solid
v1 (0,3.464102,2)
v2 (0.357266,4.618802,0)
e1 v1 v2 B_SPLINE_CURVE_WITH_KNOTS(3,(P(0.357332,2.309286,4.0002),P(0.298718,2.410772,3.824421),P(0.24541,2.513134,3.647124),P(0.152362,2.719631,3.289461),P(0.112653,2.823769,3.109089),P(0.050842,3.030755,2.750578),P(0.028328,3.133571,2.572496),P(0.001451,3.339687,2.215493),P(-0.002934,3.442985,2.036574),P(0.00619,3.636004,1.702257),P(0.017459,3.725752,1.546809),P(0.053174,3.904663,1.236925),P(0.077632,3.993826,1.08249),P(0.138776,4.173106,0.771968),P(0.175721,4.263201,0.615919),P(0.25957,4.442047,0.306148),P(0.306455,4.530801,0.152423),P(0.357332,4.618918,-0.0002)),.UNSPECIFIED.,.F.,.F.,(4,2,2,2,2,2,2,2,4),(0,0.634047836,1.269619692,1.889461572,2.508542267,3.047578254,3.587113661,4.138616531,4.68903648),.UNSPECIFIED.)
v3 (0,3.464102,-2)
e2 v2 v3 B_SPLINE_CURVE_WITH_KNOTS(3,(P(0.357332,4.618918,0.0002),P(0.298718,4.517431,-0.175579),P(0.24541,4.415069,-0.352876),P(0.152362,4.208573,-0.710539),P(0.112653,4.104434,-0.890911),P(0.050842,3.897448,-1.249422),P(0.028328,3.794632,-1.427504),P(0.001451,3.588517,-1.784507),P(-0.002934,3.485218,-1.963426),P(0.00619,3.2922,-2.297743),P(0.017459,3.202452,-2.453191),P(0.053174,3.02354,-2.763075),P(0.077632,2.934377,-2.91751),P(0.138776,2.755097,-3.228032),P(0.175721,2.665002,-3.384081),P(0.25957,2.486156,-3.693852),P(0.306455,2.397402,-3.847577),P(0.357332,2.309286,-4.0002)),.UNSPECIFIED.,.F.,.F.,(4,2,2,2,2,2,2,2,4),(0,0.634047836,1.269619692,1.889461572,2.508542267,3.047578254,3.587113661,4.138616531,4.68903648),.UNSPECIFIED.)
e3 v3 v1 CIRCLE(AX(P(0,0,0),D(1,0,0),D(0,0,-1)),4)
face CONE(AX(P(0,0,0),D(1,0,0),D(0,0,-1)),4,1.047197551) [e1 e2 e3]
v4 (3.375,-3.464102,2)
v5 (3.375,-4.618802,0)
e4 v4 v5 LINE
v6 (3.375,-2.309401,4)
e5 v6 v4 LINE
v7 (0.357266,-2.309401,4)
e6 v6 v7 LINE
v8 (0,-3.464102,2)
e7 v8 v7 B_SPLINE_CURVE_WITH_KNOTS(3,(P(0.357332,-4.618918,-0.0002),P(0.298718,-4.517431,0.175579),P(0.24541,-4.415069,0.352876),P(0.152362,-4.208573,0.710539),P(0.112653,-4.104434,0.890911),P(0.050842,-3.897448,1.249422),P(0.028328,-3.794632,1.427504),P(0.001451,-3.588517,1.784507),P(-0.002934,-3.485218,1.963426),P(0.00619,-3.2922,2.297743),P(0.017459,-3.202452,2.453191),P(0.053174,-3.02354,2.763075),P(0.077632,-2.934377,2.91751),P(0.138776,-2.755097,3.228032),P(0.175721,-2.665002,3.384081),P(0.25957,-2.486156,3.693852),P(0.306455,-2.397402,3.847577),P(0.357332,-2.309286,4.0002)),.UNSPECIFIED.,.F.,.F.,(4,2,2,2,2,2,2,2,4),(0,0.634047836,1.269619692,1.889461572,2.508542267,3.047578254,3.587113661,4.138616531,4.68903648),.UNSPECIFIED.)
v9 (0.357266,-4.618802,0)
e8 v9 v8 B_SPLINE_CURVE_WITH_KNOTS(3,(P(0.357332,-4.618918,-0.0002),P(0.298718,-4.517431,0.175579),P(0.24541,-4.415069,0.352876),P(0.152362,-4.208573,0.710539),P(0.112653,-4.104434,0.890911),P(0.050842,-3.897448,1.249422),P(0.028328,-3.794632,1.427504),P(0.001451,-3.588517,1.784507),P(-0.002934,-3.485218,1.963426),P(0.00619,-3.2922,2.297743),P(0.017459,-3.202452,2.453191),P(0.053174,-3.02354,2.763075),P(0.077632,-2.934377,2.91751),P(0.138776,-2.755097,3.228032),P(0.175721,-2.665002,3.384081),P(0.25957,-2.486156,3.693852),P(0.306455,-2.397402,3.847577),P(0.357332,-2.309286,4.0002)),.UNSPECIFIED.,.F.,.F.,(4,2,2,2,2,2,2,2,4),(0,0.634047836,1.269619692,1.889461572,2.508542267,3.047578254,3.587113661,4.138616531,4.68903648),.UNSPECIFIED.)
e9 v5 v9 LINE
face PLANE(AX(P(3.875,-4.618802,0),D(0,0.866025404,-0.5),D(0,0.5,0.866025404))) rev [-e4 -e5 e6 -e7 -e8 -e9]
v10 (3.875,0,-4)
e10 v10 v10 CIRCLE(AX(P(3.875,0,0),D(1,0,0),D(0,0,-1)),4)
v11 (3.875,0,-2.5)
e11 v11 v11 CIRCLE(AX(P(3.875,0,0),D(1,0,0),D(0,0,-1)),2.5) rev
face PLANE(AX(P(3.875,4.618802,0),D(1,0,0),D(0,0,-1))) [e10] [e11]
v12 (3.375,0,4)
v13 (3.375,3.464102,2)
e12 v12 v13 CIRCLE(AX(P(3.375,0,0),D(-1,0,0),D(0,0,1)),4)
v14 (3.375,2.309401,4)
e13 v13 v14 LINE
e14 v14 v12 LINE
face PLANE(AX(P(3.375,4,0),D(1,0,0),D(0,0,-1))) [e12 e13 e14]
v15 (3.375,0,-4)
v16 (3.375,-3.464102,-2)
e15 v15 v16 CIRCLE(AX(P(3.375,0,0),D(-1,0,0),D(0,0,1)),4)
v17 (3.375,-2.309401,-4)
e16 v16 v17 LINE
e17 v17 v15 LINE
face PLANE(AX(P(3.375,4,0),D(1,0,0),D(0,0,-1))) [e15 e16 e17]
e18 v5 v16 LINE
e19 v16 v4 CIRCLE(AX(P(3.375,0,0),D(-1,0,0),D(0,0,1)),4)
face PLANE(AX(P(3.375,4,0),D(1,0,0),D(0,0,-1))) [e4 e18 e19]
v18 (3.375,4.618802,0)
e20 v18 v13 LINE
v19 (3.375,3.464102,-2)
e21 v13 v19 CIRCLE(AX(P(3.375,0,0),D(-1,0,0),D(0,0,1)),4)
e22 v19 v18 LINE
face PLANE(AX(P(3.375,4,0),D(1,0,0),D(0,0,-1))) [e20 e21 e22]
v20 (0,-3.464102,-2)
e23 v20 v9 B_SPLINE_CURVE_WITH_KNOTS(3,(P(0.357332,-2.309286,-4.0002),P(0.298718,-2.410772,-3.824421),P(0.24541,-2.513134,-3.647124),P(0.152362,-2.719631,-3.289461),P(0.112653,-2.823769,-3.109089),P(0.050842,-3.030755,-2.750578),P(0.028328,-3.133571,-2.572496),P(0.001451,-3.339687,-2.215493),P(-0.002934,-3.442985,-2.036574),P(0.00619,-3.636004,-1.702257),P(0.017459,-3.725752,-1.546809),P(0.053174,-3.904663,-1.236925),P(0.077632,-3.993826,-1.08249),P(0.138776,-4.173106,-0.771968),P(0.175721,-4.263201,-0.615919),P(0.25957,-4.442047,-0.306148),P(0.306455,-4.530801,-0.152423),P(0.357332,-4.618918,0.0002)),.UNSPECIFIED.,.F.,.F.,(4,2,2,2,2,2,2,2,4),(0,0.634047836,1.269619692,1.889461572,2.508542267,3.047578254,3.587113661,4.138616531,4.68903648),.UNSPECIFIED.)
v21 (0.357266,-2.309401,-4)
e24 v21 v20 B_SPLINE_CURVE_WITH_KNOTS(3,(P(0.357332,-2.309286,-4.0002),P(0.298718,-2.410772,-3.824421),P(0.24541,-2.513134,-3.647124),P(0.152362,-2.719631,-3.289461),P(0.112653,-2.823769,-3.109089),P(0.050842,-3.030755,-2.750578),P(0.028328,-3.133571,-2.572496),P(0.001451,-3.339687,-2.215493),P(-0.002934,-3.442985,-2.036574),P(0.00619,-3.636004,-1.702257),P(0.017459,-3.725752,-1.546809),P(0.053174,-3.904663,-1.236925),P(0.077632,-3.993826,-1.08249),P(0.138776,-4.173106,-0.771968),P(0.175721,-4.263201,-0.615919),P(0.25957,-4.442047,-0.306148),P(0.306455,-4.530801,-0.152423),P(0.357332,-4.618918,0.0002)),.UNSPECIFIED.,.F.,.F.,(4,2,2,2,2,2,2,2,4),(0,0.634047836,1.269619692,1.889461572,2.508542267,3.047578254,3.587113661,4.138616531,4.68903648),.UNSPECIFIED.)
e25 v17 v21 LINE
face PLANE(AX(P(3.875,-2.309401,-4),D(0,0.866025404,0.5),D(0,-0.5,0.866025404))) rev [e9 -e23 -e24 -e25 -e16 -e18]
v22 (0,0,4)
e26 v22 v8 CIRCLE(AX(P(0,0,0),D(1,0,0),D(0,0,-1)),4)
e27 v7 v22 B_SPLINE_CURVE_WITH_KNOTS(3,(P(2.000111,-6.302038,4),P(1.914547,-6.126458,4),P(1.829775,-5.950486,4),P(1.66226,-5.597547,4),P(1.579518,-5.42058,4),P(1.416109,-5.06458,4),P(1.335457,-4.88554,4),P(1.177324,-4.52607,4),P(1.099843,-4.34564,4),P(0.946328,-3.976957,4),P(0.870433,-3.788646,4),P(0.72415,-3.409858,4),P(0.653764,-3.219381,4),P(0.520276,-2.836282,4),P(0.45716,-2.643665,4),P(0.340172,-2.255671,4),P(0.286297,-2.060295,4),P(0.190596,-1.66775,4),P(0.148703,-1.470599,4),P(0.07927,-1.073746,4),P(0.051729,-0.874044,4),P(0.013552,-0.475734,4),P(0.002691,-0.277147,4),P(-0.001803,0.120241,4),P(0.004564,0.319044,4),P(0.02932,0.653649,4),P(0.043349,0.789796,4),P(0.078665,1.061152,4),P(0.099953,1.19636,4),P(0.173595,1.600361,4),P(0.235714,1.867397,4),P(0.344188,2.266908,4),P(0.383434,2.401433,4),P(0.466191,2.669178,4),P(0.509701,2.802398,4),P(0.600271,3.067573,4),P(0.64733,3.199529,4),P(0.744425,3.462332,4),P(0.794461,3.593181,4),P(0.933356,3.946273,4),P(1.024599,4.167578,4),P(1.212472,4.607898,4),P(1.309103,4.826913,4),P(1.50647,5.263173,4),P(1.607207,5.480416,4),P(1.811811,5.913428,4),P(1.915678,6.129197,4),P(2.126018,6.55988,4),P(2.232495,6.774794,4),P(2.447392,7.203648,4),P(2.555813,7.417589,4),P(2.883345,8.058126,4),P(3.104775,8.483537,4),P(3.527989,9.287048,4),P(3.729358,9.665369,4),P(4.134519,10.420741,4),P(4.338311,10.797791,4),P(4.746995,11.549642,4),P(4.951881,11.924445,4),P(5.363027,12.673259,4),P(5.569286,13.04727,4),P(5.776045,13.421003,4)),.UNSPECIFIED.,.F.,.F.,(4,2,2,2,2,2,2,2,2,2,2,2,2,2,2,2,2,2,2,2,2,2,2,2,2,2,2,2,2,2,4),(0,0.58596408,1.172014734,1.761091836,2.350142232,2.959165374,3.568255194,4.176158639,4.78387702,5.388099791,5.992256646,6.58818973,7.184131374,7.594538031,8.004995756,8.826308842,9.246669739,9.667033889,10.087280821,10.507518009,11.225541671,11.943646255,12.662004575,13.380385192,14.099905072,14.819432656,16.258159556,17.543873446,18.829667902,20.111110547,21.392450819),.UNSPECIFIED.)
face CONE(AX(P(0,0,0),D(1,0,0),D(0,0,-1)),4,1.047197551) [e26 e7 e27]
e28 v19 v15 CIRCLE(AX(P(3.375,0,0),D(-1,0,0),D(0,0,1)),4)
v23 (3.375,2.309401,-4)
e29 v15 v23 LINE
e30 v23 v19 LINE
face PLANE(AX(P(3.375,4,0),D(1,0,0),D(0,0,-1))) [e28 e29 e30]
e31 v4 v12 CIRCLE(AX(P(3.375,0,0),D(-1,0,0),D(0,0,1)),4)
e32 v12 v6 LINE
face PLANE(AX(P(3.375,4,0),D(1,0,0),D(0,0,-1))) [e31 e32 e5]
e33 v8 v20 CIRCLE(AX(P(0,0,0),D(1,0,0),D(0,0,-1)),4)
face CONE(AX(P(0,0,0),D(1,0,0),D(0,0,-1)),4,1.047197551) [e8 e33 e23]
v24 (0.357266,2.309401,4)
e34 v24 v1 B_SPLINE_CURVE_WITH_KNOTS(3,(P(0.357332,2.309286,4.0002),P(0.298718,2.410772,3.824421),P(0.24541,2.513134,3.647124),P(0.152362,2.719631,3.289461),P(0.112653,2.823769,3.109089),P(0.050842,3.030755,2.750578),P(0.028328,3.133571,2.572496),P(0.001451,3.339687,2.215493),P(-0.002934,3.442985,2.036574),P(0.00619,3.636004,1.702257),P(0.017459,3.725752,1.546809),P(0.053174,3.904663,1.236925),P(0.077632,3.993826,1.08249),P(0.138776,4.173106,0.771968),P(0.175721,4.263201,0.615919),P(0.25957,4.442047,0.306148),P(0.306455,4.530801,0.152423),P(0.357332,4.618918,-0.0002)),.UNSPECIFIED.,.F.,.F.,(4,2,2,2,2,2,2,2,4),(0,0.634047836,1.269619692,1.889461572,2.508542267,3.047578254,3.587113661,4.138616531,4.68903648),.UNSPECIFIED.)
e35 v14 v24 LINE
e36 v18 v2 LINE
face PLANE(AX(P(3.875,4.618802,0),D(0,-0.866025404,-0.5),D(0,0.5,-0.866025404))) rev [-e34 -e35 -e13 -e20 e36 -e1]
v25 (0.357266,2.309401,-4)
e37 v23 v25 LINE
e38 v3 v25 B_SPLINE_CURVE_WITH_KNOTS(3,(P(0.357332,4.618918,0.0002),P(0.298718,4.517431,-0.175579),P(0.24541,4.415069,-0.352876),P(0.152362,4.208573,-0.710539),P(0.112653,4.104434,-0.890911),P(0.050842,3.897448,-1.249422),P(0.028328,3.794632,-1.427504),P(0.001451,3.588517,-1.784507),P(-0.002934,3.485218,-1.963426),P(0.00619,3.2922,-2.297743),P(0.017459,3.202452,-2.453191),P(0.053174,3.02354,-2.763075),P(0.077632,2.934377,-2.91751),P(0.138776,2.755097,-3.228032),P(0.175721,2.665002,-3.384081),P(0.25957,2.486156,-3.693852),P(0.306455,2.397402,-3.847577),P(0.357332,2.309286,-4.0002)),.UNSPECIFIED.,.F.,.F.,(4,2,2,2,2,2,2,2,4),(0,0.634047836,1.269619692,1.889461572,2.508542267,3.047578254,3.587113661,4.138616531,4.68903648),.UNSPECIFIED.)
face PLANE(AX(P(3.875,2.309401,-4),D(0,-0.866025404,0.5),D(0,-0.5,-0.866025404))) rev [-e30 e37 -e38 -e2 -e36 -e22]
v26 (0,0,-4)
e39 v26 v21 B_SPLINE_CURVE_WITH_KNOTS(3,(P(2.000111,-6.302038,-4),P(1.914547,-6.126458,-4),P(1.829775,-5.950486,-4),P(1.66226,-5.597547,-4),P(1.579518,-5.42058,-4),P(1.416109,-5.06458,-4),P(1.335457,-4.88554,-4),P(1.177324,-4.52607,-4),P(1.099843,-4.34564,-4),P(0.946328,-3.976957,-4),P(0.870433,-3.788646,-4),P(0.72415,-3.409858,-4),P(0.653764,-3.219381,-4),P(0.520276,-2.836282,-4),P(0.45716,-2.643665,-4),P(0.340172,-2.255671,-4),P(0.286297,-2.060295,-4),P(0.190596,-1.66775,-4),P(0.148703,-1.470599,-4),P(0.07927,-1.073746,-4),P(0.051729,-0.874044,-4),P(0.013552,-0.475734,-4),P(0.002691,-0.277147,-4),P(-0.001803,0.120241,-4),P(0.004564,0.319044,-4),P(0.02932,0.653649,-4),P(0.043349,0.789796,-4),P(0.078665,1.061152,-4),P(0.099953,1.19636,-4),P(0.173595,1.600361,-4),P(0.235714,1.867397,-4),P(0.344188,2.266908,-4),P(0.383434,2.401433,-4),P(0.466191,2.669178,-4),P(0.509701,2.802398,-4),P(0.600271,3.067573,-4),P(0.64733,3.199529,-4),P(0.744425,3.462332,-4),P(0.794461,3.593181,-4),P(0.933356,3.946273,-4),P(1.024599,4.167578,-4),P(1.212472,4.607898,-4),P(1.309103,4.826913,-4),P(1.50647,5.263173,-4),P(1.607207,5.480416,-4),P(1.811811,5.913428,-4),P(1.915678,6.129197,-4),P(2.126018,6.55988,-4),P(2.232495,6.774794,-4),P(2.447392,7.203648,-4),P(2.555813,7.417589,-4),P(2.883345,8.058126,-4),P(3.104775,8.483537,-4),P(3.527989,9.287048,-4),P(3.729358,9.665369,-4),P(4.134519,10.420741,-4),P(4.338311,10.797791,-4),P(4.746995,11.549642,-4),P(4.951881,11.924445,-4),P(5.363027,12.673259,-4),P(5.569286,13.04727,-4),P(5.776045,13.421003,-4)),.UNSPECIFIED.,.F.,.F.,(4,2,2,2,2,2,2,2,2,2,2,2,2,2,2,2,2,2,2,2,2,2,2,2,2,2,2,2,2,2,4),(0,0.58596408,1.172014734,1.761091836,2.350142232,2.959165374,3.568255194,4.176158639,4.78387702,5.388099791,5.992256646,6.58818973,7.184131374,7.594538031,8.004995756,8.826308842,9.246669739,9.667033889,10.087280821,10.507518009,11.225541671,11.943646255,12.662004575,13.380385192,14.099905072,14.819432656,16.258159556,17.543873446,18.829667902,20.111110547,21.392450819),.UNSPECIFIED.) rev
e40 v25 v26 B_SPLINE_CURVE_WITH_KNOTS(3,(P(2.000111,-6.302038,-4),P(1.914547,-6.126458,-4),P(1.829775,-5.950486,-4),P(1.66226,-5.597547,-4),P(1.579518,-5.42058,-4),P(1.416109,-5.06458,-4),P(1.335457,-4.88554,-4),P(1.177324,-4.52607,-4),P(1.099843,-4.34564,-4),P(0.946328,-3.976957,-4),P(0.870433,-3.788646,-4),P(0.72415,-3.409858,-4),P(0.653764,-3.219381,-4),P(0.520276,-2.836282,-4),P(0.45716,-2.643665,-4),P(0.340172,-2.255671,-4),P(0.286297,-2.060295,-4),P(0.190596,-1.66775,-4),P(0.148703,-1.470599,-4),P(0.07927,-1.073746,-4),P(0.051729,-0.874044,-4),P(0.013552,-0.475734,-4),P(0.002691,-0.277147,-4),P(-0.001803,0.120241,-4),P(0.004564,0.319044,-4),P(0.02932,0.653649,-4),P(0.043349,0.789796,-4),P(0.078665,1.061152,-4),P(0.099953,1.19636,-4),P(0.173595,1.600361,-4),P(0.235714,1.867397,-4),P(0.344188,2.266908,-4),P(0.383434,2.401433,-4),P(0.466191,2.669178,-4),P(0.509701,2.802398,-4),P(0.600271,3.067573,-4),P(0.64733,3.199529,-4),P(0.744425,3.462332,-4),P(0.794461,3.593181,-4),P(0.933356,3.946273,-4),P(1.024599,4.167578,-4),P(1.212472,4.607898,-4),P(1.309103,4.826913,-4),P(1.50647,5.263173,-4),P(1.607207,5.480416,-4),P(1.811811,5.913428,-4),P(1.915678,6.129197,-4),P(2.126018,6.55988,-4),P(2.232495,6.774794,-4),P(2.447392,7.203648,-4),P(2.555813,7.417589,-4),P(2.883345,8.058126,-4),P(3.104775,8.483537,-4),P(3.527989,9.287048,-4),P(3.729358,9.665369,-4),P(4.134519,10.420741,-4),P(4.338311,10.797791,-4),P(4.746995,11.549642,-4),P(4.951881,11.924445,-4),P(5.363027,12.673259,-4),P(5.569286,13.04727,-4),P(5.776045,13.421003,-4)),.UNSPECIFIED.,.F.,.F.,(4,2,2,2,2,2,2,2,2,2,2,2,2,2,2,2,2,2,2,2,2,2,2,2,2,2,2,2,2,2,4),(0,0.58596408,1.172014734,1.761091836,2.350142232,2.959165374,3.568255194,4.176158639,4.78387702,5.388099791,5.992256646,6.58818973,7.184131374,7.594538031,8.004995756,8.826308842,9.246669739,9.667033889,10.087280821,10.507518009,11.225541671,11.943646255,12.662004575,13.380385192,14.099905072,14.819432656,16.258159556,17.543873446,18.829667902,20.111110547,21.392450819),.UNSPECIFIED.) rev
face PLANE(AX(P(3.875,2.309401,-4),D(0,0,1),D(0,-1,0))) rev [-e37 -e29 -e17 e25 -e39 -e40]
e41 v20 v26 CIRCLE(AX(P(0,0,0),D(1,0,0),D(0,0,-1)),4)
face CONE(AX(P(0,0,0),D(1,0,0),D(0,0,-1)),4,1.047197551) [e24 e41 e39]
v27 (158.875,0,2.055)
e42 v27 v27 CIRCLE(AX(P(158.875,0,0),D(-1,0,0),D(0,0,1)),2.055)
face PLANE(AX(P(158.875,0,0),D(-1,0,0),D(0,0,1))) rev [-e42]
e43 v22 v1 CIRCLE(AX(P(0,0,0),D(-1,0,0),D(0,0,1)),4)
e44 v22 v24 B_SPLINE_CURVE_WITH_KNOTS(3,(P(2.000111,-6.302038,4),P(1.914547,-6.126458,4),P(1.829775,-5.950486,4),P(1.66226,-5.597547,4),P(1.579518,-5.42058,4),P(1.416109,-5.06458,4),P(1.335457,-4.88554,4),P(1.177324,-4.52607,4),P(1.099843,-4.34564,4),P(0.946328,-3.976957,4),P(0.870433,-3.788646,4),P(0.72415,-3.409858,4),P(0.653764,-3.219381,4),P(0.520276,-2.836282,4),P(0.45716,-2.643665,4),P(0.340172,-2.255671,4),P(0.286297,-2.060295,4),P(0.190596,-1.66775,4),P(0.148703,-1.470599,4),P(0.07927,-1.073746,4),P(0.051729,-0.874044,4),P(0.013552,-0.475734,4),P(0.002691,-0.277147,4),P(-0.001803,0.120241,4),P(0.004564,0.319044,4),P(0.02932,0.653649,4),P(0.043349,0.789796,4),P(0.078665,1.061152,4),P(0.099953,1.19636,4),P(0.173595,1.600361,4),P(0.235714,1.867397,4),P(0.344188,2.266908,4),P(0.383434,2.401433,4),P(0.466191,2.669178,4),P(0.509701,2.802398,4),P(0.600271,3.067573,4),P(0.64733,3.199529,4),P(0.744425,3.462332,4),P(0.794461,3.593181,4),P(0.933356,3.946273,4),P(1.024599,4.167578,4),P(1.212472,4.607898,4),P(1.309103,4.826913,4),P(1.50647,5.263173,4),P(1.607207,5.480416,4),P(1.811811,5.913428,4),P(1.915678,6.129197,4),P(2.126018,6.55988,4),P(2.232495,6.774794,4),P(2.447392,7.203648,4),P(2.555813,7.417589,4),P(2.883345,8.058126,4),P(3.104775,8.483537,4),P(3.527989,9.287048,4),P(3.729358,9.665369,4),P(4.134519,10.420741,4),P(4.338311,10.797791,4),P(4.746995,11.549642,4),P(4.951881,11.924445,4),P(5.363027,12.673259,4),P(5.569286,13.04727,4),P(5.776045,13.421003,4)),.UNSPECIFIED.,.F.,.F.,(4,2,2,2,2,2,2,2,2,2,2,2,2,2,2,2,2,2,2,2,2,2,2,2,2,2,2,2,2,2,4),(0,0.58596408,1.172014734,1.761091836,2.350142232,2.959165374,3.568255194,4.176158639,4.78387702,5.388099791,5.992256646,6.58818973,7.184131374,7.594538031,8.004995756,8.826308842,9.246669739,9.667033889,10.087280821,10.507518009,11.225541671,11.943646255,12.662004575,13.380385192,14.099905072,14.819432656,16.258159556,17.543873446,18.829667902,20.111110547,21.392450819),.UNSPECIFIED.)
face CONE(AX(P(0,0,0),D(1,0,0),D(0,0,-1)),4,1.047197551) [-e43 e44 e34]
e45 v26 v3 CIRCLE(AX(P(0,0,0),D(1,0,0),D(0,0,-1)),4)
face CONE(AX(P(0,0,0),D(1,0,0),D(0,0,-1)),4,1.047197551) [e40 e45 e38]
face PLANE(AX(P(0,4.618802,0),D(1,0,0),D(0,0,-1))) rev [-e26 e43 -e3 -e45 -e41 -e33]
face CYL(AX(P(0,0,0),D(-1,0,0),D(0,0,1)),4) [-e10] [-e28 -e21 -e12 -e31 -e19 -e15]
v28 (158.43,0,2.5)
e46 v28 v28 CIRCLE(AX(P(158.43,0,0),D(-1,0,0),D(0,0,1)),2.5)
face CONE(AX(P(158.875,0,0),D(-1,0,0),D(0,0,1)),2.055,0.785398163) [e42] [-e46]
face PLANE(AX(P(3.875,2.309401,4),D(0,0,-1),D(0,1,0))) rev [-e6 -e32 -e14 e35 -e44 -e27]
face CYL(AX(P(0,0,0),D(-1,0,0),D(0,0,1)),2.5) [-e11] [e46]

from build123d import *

# Parameters (mm, degrees)
BASEHEAD_DEPTH = 3.875
SKETCH4_W      = 0.5
SKETCH4_H      = 10.618802154


# Read off the part's stored shape, not the designer's step: HeadChamfer
with BuildPart() as part:
    # Sketch1 → BaseHead (new body)
    with BuildSketch(Plane(origin=(0, 0, 0), x_dir=(0, 0, -1), z_dir=(1, 0, 0))):
        Polygon((4, 2.309401077), (4, -2.309401077), (0, -4.618802154), (-4, -2.309401077), (-4, 2.309401077), (0, 4.618802154), align=None)
    extrude(amount=BASEHEAD_DEPTH)

    # HeadChamfer outline → HeadChamfer (revolve, cut)
    with BuildSketch(Plane.YX):
        Polygon((4.618802148, 0.357265587), (3.999999382, -3.57e-07), (4.618802154, -3.57e-07), align=None)
    revolve(axis=Axis((0, 0, 0), (1, 0, 0)), mode=Mode.SUBTRACT)

    # HeadChamfer 2 outline → HeadChamfer 2 (revolve)
    with BuildSketch(Plane.YX):
        Polygon((2.5, 3.875), (2.5, 158.43), (2.055, 158.875), (0, 158.875), (0, 3.875), align=None)
    revolve(axis=Axis((0, 0, 0), (1, 0, 0)))

    # Sketch4 → BearingFace (revolve, cut)
    with BuildSketch(Plane.XY, mode=Mode.PRIVATE) as bearingface_sk:
        with Locations((3.625, 9.309401077)):
            Rectangle(SKETCH4_W, SKETCH4_H)
    revolve(bearingface_sk.sketch.rotate(Axis((0, 0, 0), (1, 0, 0)), 90), axis=Axis((0, 0, 0), (1, 0, 0)), mode=Mode.SUBTRACT)


solid = part.part
